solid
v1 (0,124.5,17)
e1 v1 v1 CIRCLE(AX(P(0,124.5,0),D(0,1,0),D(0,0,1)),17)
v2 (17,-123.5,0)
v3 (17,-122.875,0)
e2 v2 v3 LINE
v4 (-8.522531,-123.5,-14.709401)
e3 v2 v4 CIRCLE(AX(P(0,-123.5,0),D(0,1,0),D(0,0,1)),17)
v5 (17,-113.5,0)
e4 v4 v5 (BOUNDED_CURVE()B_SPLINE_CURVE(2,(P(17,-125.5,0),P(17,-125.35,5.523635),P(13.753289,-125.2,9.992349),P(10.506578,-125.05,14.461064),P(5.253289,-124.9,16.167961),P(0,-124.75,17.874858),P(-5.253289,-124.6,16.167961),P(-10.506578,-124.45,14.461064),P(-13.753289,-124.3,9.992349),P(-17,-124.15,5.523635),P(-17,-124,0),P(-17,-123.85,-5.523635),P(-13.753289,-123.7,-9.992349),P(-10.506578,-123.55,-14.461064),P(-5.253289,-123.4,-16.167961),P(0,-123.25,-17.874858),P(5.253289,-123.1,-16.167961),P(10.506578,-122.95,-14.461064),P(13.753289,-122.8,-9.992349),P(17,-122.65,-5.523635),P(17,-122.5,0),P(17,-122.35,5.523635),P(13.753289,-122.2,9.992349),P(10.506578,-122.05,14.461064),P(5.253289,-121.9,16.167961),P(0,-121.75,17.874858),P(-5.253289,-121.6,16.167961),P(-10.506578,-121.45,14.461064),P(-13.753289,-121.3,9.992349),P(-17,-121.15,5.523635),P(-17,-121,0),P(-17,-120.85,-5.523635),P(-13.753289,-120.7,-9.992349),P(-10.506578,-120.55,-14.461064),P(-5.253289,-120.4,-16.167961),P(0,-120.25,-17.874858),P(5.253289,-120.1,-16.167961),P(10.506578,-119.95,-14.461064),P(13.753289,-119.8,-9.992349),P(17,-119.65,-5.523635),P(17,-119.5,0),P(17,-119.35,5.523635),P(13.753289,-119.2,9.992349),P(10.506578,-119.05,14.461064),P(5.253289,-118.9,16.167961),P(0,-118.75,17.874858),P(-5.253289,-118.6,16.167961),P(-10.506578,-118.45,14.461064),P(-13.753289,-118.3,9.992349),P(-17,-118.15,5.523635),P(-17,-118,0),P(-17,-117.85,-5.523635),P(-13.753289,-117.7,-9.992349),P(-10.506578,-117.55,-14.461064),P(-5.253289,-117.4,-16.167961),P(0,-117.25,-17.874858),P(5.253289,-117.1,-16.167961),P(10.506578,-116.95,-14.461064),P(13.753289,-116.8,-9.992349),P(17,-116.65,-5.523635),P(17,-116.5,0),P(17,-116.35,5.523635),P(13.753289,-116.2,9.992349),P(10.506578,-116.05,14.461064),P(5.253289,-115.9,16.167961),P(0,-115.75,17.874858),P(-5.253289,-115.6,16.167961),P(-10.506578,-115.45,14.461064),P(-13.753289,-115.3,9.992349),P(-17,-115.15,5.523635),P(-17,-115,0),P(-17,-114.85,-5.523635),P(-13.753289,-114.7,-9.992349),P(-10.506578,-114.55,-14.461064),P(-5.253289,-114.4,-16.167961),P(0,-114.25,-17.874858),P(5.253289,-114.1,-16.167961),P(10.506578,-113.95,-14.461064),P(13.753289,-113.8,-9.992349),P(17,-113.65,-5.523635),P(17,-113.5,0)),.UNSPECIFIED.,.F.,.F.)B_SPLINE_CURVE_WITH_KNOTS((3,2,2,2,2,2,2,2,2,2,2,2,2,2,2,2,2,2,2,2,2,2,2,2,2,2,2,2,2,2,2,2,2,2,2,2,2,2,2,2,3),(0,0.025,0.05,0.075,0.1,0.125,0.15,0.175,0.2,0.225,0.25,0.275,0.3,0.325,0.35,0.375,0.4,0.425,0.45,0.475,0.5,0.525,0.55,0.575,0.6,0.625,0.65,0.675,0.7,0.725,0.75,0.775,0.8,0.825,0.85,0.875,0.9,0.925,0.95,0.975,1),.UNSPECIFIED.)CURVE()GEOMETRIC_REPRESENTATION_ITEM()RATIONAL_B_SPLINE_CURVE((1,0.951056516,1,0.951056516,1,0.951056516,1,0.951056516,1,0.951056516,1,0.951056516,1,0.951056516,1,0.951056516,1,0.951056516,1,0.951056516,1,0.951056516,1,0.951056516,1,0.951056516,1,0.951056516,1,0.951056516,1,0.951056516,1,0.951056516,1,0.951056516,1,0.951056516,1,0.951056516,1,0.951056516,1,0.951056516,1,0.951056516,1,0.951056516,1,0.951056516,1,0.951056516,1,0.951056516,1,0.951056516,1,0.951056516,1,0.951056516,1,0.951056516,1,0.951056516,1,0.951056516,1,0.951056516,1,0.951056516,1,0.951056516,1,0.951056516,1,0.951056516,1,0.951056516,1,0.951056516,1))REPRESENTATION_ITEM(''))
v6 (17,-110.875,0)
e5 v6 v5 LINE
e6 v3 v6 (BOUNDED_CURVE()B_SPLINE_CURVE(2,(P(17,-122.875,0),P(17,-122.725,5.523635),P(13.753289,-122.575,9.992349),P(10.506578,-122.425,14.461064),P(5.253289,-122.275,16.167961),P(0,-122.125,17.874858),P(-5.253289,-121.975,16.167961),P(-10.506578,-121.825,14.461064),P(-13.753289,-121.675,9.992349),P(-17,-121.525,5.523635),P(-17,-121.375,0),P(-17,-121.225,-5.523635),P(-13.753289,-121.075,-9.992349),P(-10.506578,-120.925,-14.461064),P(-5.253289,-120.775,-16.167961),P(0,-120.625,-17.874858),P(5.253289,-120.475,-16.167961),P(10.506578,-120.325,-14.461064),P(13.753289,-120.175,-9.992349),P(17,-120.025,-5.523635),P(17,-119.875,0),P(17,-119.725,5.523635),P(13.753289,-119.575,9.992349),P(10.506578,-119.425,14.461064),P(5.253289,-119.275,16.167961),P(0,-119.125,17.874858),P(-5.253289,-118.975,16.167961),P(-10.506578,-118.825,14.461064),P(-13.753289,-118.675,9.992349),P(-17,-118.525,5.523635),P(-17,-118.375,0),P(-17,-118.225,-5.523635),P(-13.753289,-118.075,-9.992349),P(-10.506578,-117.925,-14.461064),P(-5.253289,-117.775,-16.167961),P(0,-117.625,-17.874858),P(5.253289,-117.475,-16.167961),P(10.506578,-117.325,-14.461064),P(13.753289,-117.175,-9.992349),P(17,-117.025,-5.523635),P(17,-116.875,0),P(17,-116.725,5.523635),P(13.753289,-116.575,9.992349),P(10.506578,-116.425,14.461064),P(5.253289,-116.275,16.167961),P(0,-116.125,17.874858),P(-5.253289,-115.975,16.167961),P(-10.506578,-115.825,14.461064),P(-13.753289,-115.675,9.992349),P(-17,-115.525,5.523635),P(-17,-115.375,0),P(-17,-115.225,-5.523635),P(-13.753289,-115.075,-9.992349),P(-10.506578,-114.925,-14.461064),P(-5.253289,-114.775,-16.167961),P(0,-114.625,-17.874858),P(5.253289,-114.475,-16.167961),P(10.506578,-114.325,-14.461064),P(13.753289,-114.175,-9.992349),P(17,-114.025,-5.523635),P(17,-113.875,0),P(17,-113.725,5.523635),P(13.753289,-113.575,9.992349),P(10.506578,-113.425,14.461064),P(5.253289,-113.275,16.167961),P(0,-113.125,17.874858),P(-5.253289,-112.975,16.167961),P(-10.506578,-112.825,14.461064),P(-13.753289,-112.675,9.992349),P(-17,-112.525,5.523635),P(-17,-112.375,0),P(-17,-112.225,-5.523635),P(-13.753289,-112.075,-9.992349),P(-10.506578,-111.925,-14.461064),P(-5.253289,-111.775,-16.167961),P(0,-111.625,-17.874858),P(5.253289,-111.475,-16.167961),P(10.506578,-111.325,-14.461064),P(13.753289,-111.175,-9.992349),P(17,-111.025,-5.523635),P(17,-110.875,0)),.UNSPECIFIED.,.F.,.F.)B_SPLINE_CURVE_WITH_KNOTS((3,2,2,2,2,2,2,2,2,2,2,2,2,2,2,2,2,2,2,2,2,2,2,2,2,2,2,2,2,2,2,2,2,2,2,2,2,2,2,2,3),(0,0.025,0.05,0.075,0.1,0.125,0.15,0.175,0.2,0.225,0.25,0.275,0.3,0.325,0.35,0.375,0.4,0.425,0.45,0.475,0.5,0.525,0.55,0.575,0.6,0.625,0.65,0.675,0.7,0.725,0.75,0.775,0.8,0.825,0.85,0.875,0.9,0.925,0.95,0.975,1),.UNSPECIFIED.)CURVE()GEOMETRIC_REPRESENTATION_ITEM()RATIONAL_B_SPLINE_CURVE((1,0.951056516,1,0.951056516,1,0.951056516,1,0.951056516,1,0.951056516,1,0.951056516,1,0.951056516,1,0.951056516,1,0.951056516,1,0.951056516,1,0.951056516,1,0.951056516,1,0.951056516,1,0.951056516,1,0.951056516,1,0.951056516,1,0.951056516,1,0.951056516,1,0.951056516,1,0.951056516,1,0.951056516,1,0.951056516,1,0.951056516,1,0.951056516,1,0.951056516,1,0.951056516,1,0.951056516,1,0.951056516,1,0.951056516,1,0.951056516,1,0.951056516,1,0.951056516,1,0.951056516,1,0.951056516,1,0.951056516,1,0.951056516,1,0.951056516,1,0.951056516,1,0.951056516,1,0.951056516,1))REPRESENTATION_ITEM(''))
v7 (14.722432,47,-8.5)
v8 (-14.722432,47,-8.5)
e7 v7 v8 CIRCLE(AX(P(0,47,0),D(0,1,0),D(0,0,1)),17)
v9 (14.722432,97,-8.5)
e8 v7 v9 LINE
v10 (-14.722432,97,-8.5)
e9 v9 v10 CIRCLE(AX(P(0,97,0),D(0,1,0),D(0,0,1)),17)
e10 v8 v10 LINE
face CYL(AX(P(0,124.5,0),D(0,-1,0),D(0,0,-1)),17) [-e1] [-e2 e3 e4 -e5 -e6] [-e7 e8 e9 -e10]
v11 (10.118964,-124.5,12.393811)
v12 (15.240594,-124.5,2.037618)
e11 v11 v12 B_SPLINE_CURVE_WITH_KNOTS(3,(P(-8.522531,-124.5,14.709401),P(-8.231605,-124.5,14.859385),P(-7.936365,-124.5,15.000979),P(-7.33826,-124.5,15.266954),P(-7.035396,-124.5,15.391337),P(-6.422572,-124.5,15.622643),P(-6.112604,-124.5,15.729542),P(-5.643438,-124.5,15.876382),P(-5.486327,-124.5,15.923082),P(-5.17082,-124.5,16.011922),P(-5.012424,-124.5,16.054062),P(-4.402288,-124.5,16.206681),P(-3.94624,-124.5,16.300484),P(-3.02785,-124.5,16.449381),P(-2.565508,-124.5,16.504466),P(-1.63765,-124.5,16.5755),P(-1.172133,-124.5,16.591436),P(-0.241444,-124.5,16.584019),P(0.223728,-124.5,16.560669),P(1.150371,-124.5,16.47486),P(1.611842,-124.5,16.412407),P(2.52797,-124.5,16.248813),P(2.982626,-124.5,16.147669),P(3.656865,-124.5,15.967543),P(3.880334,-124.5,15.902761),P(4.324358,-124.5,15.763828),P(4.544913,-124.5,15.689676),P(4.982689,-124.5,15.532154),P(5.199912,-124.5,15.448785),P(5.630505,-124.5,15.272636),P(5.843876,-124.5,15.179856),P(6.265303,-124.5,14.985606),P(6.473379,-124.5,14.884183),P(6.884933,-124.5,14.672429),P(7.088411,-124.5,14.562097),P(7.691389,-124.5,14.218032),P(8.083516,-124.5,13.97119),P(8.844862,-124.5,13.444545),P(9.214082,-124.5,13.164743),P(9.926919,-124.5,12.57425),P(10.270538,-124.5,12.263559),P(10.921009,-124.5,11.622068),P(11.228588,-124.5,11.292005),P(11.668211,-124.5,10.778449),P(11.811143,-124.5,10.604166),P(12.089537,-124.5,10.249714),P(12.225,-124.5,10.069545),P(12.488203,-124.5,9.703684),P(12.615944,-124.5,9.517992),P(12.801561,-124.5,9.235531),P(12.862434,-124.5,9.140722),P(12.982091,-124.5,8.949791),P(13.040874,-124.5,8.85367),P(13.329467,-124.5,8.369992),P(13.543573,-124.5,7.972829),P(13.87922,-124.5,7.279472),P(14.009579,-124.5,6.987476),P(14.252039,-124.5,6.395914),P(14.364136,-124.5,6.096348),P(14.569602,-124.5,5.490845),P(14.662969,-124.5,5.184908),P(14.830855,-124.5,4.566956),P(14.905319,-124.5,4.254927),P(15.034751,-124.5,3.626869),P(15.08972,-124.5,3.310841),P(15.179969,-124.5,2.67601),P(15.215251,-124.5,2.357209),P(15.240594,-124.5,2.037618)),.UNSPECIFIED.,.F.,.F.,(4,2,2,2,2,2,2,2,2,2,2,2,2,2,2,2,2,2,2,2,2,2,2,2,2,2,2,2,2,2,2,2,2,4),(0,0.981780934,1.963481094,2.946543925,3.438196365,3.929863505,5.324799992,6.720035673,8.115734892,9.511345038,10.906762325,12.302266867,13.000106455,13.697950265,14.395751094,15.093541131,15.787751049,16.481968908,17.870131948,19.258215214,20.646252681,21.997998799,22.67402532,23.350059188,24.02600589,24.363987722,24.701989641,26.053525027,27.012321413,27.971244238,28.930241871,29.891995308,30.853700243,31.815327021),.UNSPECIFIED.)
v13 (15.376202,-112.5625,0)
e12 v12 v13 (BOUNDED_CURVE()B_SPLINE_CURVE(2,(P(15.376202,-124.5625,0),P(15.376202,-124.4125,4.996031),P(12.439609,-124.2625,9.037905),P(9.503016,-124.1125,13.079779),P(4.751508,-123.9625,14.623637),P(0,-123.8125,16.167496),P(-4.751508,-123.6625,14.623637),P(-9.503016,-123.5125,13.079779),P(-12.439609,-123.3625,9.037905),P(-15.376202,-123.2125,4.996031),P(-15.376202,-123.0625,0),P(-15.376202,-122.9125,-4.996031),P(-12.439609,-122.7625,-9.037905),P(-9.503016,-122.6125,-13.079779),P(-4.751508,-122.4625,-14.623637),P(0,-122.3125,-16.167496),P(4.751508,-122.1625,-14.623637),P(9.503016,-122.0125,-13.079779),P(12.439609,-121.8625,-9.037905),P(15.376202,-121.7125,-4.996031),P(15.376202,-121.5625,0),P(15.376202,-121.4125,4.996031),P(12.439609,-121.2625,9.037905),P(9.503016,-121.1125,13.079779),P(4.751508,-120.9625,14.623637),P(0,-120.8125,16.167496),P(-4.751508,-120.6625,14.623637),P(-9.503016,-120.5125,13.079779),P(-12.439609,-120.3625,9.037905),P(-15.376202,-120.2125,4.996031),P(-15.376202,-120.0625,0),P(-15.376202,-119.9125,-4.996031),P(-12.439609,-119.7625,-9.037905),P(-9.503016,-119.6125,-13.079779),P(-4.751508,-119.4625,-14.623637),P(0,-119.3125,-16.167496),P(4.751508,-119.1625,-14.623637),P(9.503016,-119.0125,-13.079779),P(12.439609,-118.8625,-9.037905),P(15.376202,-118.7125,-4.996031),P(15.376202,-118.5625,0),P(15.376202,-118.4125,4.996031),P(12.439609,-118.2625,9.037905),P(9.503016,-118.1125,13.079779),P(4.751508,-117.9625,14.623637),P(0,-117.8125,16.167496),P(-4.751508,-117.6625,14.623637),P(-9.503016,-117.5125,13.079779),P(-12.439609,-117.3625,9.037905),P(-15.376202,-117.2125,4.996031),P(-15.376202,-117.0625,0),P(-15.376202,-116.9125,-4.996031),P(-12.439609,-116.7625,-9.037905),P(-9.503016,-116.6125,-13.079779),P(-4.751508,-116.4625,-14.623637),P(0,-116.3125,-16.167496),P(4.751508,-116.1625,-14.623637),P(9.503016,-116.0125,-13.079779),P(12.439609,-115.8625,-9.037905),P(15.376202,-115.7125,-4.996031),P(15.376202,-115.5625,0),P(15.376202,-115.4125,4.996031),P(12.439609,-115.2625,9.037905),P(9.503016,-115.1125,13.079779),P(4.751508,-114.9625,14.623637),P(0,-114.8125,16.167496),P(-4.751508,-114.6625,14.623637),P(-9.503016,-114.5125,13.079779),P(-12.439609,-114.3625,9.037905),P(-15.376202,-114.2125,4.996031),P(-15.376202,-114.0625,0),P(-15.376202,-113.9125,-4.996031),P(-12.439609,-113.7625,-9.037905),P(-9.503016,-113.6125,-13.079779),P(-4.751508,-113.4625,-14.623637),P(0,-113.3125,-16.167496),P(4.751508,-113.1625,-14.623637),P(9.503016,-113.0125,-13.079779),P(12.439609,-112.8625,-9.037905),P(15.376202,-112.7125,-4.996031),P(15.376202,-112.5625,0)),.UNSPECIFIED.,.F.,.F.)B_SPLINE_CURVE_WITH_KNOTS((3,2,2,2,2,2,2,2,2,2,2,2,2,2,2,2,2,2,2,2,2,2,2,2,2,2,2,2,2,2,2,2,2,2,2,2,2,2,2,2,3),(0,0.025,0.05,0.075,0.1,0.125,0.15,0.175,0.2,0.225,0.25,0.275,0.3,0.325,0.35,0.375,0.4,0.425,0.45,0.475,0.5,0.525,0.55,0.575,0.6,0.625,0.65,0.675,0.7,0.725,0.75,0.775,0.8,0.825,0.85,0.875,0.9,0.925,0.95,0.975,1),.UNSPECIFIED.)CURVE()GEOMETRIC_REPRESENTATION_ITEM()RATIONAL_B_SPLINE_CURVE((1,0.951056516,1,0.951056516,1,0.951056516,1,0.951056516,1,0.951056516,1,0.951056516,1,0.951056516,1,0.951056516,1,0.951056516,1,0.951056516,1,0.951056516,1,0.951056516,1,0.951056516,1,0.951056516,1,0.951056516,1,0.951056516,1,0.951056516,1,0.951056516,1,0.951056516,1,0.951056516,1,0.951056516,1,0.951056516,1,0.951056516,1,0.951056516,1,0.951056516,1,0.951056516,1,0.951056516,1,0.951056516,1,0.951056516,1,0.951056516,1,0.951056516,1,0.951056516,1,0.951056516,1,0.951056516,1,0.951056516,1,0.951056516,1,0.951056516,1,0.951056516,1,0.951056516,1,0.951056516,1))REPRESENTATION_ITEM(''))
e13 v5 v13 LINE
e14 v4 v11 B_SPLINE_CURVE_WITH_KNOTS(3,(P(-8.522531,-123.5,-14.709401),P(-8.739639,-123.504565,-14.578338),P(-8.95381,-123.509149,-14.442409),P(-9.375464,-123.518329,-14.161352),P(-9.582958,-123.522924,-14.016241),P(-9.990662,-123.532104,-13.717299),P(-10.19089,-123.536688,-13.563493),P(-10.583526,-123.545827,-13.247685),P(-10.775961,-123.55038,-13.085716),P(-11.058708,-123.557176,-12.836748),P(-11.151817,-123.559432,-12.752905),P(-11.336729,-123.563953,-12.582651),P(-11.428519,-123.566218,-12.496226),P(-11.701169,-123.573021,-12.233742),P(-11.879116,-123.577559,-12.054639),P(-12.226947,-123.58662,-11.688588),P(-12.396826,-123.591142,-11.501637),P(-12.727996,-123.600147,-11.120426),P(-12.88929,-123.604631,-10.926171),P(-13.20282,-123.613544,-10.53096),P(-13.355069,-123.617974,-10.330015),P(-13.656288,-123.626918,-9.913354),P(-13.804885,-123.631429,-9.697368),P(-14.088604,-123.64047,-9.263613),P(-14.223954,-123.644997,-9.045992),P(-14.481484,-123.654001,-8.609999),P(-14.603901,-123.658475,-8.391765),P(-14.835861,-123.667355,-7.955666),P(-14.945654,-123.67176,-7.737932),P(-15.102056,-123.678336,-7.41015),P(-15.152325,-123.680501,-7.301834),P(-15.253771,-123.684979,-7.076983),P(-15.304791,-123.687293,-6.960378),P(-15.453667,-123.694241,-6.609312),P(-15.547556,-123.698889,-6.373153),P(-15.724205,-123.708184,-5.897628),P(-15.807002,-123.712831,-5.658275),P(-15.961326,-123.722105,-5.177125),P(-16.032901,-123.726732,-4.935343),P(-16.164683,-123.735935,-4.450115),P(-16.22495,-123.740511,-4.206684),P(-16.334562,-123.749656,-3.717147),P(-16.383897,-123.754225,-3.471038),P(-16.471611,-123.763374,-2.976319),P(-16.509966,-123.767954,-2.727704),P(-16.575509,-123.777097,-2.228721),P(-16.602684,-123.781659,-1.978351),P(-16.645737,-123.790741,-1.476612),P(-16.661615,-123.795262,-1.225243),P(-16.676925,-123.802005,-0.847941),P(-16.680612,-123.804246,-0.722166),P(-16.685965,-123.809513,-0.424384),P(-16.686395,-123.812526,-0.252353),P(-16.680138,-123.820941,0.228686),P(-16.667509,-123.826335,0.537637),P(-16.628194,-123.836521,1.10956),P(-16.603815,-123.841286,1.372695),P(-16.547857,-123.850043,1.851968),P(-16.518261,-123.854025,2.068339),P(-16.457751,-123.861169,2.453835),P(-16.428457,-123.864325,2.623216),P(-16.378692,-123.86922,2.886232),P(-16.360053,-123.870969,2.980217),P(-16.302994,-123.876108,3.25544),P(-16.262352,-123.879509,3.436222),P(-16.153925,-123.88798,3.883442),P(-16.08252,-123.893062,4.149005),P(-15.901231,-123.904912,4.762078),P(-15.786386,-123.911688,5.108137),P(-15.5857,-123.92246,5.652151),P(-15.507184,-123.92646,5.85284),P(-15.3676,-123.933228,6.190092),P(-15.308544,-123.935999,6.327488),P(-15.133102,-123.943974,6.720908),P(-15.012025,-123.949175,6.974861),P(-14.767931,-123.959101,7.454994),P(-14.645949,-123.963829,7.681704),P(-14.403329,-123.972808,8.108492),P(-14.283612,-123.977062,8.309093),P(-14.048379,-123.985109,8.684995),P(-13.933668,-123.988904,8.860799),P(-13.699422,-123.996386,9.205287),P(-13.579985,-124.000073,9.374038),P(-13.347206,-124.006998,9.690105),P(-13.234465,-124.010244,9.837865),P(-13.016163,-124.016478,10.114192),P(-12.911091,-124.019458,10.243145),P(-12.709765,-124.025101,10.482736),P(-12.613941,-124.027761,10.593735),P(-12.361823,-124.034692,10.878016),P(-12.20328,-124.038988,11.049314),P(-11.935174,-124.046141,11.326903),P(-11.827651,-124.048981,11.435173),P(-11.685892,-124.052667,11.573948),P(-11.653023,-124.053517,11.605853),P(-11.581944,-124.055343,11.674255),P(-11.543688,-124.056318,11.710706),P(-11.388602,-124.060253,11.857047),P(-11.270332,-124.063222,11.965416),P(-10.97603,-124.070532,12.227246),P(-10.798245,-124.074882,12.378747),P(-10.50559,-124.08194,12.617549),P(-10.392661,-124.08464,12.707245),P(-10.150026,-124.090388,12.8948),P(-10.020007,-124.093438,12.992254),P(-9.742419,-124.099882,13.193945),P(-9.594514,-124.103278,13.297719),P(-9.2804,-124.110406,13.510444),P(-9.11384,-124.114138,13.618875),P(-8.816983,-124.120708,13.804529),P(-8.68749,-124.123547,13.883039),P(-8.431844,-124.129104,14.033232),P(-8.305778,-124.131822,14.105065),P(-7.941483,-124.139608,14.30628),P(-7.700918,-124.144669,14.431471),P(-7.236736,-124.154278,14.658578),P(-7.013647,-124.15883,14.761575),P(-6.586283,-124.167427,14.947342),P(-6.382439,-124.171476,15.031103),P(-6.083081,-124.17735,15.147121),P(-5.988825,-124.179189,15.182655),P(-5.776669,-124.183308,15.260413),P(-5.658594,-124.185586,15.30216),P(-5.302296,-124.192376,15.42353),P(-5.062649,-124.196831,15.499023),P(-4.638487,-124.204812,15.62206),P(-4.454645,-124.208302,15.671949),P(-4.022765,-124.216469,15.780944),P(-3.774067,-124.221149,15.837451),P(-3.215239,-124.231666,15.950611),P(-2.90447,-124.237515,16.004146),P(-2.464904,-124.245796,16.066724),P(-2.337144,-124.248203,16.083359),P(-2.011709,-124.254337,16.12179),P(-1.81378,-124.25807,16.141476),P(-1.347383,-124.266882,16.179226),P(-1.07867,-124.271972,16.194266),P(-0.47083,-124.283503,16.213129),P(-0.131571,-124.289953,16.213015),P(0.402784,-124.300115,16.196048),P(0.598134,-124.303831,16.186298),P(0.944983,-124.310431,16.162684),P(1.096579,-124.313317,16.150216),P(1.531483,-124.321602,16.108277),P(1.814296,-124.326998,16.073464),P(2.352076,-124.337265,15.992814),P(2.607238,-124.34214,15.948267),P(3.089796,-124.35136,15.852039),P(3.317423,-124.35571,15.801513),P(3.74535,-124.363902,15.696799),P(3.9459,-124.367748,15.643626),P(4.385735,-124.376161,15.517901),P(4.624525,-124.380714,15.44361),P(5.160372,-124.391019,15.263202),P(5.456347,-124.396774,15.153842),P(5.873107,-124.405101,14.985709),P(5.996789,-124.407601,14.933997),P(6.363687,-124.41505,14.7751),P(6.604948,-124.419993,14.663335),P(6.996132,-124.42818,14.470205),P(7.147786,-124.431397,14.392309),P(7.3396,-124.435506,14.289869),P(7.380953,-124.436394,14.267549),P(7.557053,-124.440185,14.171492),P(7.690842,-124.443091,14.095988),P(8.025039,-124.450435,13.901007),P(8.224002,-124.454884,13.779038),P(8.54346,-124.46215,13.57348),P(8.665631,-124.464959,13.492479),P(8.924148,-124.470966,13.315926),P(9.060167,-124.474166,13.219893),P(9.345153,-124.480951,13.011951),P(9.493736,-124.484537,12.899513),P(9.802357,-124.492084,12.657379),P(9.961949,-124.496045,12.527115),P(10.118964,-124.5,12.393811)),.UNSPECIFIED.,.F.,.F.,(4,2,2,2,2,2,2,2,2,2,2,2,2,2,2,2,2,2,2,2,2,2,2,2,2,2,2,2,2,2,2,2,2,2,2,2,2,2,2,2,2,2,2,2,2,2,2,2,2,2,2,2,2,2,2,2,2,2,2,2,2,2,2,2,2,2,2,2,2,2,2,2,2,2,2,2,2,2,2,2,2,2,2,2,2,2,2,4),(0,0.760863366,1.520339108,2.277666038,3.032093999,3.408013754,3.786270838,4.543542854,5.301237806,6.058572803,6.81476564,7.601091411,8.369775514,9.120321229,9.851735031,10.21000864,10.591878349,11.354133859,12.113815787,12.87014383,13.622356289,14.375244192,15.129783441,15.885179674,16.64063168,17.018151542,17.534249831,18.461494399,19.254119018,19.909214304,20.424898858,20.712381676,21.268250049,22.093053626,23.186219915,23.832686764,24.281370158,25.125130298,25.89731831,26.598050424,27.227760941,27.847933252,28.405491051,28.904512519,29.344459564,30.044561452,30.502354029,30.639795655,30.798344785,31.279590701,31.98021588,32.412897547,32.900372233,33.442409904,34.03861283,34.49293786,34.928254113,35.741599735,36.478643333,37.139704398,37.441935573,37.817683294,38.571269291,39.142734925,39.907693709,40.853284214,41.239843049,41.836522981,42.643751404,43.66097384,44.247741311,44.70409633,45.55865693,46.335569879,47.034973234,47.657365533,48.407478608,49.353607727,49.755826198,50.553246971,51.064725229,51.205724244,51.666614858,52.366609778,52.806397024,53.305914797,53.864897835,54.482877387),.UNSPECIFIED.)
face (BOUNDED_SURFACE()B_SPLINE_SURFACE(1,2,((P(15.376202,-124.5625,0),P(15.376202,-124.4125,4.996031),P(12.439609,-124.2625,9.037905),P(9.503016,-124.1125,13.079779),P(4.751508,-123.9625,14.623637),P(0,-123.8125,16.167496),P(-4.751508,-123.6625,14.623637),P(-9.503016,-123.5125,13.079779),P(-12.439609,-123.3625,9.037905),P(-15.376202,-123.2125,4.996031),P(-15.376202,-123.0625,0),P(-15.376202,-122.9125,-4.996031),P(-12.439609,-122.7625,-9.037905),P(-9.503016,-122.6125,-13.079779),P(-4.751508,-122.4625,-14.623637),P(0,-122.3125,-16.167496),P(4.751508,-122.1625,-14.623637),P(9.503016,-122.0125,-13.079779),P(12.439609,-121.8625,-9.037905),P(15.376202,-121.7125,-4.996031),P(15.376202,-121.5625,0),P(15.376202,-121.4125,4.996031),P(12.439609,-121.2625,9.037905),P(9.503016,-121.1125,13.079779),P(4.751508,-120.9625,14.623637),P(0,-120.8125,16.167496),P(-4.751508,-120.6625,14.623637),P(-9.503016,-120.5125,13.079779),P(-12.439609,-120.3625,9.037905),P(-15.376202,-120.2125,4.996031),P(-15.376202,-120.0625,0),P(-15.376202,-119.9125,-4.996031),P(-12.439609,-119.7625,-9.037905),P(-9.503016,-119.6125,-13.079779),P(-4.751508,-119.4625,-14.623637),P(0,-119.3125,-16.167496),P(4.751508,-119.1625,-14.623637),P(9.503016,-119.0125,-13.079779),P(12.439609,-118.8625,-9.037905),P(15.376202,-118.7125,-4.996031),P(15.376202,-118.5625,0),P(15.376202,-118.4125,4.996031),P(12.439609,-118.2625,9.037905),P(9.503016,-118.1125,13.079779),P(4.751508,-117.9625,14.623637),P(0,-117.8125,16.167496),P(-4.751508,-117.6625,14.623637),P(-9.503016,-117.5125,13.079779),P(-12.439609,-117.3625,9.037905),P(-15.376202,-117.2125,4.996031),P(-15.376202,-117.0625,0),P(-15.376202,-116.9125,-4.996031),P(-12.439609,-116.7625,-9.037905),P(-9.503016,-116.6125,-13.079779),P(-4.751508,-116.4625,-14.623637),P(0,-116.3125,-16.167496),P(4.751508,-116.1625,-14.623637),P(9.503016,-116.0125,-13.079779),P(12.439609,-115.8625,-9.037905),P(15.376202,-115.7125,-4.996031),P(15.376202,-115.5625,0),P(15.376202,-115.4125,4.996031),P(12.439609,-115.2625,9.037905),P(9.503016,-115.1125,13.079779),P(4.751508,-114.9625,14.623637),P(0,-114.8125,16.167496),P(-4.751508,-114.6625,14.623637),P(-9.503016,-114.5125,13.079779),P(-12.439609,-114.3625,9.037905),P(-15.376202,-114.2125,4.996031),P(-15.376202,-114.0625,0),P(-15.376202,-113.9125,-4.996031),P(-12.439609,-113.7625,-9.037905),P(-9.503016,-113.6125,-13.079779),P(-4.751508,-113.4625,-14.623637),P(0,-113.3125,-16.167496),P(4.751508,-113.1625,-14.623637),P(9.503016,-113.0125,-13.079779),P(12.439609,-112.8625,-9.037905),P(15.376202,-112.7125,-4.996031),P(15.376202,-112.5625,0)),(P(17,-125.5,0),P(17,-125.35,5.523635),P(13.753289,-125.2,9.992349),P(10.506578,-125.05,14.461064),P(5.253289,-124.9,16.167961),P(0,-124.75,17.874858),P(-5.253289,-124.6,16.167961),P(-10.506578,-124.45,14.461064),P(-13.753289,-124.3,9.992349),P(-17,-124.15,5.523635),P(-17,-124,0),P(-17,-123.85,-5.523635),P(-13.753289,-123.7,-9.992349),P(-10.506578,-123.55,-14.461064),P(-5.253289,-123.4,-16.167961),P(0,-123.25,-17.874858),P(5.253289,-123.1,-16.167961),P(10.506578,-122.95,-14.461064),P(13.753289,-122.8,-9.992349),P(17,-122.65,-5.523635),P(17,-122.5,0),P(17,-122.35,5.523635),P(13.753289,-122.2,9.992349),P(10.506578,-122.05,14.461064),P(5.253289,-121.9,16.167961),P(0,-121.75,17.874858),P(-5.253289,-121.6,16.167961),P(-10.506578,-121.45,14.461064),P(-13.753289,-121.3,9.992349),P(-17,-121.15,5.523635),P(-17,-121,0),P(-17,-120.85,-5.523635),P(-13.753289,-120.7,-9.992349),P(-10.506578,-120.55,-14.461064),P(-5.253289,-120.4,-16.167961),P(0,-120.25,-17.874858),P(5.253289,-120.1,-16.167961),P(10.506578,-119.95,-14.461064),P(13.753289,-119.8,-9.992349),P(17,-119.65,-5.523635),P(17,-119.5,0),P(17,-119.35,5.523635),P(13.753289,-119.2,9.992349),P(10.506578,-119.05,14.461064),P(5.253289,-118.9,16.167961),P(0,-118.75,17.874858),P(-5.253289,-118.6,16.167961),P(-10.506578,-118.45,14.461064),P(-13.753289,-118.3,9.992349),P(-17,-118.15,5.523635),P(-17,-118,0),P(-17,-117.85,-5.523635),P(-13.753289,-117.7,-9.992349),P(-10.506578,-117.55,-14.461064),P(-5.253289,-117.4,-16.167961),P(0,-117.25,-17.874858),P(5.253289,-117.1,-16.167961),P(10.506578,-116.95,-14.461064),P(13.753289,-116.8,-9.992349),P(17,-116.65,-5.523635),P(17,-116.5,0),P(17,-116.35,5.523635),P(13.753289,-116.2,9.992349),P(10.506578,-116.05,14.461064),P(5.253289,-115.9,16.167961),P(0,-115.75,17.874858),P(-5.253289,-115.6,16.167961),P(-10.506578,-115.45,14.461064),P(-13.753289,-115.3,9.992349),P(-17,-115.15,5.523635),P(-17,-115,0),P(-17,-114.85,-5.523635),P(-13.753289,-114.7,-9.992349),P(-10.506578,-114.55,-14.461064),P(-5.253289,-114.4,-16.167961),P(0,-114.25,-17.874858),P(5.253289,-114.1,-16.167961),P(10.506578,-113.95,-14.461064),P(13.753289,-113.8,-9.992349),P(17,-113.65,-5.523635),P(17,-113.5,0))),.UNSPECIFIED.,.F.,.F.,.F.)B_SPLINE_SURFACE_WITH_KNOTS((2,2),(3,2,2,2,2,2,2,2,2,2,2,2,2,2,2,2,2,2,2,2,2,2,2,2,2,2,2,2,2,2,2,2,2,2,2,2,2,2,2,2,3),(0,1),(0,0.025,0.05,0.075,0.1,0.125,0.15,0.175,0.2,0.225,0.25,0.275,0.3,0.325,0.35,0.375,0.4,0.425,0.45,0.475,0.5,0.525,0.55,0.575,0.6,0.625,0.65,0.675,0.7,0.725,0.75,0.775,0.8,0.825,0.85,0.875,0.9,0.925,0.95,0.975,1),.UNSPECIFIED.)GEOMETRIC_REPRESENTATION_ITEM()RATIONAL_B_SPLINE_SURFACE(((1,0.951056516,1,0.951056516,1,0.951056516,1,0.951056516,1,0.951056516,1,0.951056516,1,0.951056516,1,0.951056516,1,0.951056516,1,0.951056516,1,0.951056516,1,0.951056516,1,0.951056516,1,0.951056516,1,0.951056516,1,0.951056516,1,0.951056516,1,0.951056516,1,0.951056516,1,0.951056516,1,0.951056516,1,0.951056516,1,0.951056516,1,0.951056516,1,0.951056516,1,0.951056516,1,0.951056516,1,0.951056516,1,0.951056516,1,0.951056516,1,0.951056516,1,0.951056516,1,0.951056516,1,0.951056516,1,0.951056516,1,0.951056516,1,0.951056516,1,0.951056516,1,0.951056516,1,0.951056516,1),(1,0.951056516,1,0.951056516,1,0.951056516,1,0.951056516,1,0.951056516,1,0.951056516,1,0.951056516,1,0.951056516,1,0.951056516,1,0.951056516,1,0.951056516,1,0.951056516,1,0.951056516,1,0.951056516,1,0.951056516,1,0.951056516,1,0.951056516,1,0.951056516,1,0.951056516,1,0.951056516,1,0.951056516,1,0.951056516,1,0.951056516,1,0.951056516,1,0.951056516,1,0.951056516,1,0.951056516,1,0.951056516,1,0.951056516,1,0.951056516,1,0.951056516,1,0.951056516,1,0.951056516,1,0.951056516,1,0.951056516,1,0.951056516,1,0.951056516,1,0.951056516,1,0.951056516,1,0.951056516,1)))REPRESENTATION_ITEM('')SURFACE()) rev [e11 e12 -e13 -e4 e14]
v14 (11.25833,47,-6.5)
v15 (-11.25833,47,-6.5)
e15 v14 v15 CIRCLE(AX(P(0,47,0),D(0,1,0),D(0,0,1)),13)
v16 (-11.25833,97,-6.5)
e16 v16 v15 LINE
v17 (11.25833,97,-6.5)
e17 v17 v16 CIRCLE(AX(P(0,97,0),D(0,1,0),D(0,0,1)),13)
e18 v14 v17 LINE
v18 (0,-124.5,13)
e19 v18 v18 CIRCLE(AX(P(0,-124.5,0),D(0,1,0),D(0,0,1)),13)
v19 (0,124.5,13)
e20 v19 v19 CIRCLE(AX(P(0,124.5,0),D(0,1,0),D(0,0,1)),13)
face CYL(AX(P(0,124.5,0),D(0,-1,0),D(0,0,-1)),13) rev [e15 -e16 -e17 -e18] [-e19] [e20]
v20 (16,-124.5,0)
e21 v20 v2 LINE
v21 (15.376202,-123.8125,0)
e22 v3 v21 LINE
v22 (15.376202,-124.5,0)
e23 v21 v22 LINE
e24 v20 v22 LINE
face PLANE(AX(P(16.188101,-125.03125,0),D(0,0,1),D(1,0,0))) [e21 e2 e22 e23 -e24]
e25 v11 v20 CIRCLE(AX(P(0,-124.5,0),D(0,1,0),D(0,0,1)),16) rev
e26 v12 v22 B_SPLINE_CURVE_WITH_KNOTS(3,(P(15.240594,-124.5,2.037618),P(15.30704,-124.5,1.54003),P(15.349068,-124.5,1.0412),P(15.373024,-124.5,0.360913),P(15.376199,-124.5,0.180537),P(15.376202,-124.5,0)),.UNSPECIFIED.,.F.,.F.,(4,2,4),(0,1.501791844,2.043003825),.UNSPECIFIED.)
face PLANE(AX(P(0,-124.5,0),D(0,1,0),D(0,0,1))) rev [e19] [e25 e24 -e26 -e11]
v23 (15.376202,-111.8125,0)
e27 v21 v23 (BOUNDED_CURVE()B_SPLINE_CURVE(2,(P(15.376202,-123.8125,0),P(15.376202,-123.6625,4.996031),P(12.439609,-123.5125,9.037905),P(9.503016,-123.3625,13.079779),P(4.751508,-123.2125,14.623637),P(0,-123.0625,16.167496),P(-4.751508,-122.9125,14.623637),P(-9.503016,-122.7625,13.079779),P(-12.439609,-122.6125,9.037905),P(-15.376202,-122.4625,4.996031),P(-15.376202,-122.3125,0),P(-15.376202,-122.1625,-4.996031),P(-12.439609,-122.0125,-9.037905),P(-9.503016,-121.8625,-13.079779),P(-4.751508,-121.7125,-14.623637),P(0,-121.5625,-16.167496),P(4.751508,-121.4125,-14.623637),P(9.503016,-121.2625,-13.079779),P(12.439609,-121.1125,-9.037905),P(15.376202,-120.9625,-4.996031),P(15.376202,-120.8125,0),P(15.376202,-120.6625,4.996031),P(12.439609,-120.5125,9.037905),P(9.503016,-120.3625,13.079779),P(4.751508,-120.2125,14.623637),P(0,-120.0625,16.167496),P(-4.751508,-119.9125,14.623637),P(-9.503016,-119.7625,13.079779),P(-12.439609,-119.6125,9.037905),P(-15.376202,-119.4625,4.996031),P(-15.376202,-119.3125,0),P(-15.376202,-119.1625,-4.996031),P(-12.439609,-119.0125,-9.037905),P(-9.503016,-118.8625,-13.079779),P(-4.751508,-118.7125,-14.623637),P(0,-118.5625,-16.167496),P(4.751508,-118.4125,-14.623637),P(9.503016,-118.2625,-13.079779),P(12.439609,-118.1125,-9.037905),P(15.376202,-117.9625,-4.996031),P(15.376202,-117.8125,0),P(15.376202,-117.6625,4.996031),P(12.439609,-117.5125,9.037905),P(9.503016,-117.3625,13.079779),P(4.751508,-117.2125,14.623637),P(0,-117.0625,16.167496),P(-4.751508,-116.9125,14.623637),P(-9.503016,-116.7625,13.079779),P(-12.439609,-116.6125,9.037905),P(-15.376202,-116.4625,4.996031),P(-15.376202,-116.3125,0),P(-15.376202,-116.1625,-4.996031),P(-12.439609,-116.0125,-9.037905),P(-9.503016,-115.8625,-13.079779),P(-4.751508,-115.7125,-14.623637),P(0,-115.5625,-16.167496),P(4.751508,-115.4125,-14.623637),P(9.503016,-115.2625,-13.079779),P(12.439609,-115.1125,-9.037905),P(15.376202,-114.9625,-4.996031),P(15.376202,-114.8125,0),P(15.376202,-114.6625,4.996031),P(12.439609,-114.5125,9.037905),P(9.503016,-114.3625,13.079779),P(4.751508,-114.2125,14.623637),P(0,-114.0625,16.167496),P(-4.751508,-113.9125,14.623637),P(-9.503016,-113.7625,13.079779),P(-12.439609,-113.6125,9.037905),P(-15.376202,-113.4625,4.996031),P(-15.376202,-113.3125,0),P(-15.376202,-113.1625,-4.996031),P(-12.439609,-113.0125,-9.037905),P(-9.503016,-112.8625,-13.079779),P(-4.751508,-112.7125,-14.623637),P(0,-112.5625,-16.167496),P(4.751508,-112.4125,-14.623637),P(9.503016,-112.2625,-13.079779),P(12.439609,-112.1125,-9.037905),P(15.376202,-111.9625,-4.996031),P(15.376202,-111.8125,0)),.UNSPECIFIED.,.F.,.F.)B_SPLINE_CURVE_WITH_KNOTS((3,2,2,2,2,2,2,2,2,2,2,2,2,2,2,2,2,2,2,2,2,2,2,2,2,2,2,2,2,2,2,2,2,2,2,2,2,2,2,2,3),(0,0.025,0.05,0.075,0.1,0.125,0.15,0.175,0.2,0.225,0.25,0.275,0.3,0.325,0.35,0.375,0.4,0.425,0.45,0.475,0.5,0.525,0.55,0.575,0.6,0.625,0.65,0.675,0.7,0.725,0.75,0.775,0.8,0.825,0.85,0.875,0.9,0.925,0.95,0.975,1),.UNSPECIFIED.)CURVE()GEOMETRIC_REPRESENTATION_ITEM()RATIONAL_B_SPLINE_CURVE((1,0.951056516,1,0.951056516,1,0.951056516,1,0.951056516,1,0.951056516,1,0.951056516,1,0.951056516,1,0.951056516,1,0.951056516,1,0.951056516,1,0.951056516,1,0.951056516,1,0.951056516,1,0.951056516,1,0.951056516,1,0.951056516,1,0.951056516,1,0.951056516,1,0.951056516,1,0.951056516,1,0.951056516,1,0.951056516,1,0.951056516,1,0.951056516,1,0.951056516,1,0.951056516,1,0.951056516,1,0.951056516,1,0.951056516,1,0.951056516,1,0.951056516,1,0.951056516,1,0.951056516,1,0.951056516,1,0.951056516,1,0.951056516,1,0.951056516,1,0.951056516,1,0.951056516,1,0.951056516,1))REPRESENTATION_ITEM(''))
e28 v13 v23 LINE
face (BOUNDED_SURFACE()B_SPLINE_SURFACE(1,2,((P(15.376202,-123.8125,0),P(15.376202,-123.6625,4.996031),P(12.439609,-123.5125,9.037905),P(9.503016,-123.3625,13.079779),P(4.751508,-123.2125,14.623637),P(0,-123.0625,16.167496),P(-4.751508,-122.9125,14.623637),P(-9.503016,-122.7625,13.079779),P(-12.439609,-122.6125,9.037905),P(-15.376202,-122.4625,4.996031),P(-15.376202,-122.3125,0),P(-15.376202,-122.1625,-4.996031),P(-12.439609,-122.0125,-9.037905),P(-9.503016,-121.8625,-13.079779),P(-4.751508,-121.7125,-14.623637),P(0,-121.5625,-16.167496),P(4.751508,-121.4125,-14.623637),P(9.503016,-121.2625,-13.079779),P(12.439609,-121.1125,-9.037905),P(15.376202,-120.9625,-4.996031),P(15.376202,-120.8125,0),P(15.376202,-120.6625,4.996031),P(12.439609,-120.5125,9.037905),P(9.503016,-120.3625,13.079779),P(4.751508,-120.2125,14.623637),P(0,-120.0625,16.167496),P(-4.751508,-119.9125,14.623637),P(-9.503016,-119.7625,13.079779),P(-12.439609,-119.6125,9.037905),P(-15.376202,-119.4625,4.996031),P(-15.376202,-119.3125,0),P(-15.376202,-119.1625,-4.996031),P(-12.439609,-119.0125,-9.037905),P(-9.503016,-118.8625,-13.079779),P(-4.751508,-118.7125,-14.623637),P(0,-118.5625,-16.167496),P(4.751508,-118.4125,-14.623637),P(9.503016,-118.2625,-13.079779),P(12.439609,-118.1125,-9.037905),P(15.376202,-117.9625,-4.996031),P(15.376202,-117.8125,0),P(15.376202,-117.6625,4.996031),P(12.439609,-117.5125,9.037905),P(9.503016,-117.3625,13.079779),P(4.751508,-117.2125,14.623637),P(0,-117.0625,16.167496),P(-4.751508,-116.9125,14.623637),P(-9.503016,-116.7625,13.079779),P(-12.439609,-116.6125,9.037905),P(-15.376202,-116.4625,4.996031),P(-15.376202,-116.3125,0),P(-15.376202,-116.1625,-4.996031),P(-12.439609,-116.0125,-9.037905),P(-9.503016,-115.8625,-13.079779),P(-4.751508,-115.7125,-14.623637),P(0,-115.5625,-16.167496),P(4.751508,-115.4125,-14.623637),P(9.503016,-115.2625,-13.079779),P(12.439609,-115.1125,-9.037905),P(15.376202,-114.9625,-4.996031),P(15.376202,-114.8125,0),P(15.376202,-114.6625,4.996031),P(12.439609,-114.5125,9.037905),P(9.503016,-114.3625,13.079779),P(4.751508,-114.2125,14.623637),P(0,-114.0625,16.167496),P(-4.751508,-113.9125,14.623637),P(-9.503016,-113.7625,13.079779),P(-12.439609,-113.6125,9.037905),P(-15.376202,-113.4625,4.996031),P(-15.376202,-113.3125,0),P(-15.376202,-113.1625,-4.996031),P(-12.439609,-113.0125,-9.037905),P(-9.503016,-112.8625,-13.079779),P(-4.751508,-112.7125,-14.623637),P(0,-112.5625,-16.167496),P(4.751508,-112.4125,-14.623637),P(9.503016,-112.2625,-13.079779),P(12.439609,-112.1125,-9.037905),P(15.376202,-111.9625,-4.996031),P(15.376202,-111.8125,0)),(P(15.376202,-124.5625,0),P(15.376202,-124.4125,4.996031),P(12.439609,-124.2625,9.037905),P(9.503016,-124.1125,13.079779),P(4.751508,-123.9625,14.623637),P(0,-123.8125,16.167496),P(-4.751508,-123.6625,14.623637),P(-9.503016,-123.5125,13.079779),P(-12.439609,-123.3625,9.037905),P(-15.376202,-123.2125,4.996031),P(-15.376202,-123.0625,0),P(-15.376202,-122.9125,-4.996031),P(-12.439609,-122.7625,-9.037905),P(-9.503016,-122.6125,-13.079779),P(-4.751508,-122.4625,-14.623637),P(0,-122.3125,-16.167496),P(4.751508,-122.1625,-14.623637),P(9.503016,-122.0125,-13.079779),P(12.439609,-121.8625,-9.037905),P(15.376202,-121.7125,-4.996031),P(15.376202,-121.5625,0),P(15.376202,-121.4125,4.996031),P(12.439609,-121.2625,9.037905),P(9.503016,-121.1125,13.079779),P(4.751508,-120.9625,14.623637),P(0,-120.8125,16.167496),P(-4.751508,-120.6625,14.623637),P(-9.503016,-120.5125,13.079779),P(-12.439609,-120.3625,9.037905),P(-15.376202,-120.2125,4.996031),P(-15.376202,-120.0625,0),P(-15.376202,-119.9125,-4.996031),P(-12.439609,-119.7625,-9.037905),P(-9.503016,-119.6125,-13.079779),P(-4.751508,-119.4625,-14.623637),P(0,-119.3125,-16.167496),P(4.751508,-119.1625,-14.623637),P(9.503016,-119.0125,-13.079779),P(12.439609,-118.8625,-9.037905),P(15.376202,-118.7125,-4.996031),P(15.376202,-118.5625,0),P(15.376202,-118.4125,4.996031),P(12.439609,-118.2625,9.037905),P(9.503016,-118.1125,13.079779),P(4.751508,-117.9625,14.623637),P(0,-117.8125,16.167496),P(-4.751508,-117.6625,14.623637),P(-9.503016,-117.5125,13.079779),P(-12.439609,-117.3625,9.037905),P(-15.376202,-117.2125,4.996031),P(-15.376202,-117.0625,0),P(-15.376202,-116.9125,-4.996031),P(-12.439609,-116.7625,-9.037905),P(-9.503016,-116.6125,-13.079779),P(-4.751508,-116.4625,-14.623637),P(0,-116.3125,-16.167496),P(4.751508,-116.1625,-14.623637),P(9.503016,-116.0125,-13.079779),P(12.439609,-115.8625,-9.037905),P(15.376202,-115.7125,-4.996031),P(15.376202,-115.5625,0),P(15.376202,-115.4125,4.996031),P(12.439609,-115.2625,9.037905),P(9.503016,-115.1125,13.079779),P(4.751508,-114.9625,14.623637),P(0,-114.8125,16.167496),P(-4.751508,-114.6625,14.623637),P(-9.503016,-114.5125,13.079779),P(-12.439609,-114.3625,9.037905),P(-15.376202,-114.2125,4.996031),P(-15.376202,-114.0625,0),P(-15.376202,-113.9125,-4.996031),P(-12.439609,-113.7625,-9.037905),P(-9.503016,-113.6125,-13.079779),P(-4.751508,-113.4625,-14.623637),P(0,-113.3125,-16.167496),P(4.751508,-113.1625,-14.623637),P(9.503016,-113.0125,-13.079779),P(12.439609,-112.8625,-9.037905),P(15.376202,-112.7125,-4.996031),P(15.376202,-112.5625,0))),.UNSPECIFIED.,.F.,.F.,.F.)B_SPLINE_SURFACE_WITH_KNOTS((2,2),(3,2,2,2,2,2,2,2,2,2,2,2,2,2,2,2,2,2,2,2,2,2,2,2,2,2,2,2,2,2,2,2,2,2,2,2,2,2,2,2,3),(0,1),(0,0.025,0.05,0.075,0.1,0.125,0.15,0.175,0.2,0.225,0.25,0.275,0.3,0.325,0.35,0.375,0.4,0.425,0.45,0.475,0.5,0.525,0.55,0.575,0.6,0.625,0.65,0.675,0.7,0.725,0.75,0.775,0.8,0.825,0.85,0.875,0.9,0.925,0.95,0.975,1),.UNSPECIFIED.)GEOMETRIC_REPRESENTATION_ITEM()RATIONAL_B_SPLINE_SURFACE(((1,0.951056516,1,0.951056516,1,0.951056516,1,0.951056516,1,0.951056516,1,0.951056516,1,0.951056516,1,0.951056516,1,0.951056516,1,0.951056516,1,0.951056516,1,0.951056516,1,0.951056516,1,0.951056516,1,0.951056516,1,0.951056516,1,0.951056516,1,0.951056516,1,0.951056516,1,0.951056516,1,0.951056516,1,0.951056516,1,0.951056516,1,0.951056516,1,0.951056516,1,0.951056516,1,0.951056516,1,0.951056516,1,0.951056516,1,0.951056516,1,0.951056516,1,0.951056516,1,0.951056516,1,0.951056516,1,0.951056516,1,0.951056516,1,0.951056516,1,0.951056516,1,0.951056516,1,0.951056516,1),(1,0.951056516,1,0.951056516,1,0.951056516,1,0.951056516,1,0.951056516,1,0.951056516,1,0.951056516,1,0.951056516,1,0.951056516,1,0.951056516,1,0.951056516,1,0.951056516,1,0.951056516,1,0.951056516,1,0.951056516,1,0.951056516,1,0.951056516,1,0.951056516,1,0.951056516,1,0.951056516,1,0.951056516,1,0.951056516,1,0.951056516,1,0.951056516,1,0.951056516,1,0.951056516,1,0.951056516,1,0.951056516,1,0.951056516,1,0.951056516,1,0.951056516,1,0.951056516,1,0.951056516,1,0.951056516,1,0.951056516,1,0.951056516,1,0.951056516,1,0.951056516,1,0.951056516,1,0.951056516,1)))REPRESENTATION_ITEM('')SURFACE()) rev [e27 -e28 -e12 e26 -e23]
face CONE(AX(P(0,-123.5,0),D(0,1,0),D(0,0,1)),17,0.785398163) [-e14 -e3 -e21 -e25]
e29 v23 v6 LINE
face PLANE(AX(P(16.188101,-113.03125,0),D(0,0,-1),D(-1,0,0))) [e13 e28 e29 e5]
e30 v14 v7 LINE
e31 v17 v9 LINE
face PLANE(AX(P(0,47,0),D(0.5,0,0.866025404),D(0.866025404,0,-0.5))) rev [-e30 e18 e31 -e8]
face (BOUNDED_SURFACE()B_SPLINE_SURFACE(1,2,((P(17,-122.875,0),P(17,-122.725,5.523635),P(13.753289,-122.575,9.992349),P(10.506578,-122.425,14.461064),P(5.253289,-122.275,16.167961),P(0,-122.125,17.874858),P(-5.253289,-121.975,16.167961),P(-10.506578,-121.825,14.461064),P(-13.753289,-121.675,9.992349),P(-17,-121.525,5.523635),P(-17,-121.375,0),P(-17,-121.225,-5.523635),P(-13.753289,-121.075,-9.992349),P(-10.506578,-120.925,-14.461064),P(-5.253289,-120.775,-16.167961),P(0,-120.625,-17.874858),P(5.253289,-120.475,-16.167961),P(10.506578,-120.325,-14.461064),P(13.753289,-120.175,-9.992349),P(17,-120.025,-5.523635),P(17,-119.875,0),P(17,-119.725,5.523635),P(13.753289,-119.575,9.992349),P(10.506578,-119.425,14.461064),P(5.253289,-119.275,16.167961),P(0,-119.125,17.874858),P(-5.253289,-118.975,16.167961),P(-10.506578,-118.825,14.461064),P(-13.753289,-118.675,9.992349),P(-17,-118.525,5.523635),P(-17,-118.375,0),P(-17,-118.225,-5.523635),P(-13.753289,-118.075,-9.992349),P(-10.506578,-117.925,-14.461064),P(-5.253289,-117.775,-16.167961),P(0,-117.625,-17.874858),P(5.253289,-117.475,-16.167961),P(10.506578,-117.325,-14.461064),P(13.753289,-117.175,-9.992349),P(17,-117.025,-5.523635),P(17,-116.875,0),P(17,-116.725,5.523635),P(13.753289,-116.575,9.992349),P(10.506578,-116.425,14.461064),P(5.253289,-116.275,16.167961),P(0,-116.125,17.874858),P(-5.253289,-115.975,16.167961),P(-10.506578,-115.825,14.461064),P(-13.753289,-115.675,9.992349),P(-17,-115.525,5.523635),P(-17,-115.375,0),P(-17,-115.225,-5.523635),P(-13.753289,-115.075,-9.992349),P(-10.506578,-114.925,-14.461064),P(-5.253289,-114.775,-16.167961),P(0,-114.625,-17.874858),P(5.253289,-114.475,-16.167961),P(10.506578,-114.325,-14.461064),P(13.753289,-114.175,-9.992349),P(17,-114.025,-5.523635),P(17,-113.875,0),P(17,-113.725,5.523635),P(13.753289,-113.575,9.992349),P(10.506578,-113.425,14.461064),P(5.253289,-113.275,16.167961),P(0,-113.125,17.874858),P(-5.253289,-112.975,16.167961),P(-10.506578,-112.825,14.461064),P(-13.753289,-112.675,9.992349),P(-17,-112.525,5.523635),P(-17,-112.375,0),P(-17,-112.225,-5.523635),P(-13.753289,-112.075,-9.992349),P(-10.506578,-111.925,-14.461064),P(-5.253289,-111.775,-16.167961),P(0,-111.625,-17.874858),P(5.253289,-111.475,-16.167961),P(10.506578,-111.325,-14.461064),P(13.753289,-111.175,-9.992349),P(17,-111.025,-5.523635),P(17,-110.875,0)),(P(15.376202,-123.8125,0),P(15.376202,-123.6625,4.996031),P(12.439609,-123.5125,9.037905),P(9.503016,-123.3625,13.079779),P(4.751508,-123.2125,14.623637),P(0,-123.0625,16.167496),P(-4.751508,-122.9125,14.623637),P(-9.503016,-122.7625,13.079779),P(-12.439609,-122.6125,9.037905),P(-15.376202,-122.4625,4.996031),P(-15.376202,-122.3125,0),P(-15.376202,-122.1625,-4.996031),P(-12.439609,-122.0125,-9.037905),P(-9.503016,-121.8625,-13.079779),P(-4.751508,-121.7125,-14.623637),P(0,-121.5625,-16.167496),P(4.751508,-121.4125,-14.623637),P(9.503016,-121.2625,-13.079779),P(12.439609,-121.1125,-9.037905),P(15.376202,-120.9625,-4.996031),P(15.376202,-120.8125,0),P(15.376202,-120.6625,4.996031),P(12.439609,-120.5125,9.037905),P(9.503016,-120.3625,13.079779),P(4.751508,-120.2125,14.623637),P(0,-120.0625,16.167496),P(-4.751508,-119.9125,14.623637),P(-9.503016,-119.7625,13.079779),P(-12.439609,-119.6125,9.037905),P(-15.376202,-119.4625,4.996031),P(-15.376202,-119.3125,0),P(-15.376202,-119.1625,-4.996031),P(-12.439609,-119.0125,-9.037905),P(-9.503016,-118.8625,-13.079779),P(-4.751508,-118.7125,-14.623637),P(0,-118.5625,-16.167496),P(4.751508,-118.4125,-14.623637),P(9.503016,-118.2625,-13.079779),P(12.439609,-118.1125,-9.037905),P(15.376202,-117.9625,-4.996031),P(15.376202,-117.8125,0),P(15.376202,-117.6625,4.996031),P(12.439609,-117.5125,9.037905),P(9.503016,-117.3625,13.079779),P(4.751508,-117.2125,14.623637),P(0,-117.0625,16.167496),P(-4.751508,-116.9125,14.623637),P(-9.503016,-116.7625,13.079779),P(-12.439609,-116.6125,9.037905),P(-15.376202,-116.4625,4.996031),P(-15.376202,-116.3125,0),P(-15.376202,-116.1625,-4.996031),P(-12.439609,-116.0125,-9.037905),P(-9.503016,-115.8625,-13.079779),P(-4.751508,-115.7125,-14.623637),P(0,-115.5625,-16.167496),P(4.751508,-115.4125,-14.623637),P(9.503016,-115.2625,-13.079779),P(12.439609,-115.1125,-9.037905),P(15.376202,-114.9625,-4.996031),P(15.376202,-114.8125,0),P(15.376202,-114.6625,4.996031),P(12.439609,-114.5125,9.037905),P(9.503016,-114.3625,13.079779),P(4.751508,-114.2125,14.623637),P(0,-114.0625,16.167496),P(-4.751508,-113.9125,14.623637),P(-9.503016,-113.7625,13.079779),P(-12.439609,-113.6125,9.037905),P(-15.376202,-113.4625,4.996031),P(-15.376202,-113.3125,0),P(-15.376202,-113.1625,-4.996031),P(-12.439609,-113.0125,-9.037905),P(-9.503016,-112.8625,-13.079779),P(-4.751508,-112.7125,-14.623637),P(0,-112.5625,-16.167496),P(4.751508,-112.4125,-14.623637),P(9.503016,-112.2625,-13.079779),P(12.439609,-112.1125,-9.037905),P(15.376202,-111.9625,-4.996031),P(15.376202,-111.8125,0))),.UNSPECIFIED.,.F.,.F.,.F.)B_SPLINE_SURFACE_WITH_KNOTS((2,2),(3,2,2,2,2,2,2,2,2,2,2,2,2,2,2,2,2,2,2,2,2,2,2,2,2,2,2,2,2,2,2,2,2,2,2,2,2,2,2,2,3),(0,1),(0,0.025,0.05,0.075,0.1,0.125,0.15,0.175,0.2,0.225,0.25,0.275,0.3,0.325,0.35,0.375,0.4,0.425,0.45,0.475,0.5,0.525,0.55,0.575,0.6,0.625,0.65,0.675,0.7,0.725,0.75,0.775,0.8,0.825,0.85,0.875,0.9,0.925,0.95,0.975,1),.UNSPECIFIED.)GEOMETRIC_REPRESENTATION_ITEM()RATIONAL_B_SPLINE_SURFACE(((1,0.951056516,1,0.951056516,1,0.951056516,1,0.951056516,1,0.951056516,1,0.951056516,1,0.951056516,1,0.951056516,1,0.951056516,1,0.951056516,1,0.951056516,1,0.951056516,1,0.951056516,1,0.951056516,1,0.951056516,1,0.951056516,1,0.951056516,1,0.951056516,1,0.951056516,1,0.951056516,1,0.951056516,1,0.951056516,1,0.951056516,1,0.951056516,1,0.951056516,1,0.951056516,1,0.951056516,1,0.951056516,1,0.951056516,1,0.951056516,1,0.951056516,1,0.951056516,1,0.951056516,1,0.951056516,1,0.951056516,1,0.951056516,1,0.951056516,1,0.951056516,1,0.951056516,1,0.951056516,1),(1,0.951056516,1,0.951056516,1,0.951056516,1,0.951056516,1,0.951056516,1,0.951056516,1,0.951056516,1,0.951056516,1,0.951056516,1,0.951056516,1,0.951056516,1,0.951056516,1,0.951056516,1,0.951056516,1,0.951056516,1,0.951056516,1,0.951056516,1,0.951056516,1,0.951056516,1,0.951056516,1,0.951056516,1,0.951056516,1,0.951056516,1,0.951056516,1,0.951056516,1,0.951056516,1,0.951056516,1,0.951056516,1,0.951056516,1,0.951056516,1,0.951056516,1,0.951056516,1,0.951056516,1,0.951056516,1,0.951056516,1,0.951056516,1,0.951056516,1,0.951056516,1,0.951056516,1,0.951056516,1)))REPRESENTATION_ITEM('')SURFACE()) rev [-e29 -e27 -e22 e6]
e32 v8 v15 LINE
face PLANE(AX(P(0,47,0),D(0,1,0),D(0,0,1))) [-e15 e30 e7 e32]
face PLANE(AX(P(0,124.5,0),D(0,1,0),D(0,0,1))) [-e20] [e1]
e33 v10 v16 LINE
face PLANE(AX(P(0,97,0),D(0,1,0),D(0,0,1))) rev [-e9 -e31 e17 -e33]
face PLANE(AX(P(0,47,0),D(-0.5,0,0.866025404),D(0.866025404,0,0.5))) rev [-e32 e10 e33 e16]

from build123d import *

# Parameters (mm, degrees)
SKETCH1_R           = 17
SKETCH1_R_2         = 13
BOSS_EXTRUDE1_DEPTH = 124.5
CUT_EXTRUDE2_START  = 10
CUT_EXTRUDE2_DEPTH  = 50
THREAD1_PITCH       = 3
CHAMFER2_SIZE       = 1


with BuildPart() as part:
    # Sketch1 → Boss-Extrude1 (new, symmetric)
    with BuildSketch(Plane(origin=(0, 0, 0), x_dir=(1, 0, 0), z_dir=(0, 1, 0))):
        with Locations(Location((0, 0, 0), (0, 0, 270))):
            Circle(SKETCH1_R)
        with Locations(Location((0, 0, 0), (0, 0, 270))):
            Circle(SKETCH1_R_2, mode=Mode.SUBTRACT)
    extrude(amount=BOSS_EXTRUDE1_DEPTH, both=True)

    # Sketch3 → Cut-Extrude2 (cut)
    with BuildSketch(Plane(origin=(0, 87, 0), x_dir=(1, 0, 0), z_dir=(0, 1, 0)).offset(CUT_EXTRUDE2_START)):
        with BuildLine():
            Line((0, 0), (14.722431864, 8.5))
            ThreePointArc((14.722431864, 8.5), (0, 17), (-14.722431864, 8.5))
            Line((-14.722431864, 8.5), (0, 0))
        make_face()
    extrude(amount=-CUT_EXTRUDE2_DEPTH, mode=Mode.SUBTRACT)

    # Thread1: the profile of Thread Profile1 profile screwed along a left-hand helix of 4 turns, 10 arcs to a turn; built about Z, then put on its axis
    thread1_z = Axis((0, 0, 0), (0, 0, 1))
    thread1_corners = [(17.0003, 0, -0.000173205), (17.0003, 0, 2.625173197), (15.376202375, 0, 1.687499996), (15.376202375, 0, 0.937499996)]
    with BuildLine(mode=Mode.PRIVATE) as thread1_profile:
        Line(thread1_corners[0], thread1_corners[1])
        Line(thread1_corners[1], thread1_corners[2])
        Line(thread1_corners[2], thread1_corners[3])
        Line(thread1_corners[3], thread1_corners[0])
    thread1_cap = Face(thread1_profile.wire())
    thread1_turn_angles = [0, -18, -36, -54, -72, -90, -108, -126, -144, -162, -180, -198, -216, -234, -252, -270, -288, -306, -324, -342, -360]
    thread1_turn_weights = [1, 0.9510565162951535, 1, 0.9510565162951535, 1, 0.9510565162951535, 1, 0.9510565162951535, 1, 0.9510565162951535, 1, 0.9510565162951535, 1, 0.9510565162951535, 1, 0.9510565162951535, 1, 0.9510565162951535, 1, 0.9510565162951535, 1]
    thread1_turn_rails = [Edge.make_bspline([Vector(p[0], p[1], 0).rotate(thread1_z, thread1_turn_angles[k]) / thread1_turn_weights[k] + Vector(0, 0, p[2] + -THREAD1_PITCH * thread1_turn_angles[k] / 360) for k in range(21)], [0, 0, 0, 1, 1, 2, 2, 3, 3, 4, 4, 5, 5, 6, 6, 7, 7, 8, 8, 9, 9, 10, 10, 10], 2, thread1_turn_weights) for p in thread1_corners]
    thread1_turn_sides = [Face.make_surface_from_curves(thread1_turn_rails[p[0]], thread1_turn_rails[p[1]]) for p in [(0, 1), (1, 2), (2, 3), (3, 0)]]
    thread1 = Plane(origin=(0, -125.5, 0), x_dir=(1, 0, 0), z_dir=(0, 1, 0)) * Solid(Shell([*[p.moved(Location((0, 0, THREAD1_PITCH * i))) for i in range(4) for p in thread1_turn_sides], thread1_cap, thread1_cap.rotate(thread1_z, -1440).moved(Location((0, 0, -THREAD1_PITCH * -1440 / 360)))]))
    add(thread1, mode=Mode.SUBTRACT)

    # Chamfer2
    chamfer2_edges = [part.edges().sort_by_distance(p)[0] for p in [
        (-8.48872702, -124.5, -14.728934571),
    ]]
    chamfer(chamfer2_edges, length=CHAMFER2_SIZE)


solid = part.part
